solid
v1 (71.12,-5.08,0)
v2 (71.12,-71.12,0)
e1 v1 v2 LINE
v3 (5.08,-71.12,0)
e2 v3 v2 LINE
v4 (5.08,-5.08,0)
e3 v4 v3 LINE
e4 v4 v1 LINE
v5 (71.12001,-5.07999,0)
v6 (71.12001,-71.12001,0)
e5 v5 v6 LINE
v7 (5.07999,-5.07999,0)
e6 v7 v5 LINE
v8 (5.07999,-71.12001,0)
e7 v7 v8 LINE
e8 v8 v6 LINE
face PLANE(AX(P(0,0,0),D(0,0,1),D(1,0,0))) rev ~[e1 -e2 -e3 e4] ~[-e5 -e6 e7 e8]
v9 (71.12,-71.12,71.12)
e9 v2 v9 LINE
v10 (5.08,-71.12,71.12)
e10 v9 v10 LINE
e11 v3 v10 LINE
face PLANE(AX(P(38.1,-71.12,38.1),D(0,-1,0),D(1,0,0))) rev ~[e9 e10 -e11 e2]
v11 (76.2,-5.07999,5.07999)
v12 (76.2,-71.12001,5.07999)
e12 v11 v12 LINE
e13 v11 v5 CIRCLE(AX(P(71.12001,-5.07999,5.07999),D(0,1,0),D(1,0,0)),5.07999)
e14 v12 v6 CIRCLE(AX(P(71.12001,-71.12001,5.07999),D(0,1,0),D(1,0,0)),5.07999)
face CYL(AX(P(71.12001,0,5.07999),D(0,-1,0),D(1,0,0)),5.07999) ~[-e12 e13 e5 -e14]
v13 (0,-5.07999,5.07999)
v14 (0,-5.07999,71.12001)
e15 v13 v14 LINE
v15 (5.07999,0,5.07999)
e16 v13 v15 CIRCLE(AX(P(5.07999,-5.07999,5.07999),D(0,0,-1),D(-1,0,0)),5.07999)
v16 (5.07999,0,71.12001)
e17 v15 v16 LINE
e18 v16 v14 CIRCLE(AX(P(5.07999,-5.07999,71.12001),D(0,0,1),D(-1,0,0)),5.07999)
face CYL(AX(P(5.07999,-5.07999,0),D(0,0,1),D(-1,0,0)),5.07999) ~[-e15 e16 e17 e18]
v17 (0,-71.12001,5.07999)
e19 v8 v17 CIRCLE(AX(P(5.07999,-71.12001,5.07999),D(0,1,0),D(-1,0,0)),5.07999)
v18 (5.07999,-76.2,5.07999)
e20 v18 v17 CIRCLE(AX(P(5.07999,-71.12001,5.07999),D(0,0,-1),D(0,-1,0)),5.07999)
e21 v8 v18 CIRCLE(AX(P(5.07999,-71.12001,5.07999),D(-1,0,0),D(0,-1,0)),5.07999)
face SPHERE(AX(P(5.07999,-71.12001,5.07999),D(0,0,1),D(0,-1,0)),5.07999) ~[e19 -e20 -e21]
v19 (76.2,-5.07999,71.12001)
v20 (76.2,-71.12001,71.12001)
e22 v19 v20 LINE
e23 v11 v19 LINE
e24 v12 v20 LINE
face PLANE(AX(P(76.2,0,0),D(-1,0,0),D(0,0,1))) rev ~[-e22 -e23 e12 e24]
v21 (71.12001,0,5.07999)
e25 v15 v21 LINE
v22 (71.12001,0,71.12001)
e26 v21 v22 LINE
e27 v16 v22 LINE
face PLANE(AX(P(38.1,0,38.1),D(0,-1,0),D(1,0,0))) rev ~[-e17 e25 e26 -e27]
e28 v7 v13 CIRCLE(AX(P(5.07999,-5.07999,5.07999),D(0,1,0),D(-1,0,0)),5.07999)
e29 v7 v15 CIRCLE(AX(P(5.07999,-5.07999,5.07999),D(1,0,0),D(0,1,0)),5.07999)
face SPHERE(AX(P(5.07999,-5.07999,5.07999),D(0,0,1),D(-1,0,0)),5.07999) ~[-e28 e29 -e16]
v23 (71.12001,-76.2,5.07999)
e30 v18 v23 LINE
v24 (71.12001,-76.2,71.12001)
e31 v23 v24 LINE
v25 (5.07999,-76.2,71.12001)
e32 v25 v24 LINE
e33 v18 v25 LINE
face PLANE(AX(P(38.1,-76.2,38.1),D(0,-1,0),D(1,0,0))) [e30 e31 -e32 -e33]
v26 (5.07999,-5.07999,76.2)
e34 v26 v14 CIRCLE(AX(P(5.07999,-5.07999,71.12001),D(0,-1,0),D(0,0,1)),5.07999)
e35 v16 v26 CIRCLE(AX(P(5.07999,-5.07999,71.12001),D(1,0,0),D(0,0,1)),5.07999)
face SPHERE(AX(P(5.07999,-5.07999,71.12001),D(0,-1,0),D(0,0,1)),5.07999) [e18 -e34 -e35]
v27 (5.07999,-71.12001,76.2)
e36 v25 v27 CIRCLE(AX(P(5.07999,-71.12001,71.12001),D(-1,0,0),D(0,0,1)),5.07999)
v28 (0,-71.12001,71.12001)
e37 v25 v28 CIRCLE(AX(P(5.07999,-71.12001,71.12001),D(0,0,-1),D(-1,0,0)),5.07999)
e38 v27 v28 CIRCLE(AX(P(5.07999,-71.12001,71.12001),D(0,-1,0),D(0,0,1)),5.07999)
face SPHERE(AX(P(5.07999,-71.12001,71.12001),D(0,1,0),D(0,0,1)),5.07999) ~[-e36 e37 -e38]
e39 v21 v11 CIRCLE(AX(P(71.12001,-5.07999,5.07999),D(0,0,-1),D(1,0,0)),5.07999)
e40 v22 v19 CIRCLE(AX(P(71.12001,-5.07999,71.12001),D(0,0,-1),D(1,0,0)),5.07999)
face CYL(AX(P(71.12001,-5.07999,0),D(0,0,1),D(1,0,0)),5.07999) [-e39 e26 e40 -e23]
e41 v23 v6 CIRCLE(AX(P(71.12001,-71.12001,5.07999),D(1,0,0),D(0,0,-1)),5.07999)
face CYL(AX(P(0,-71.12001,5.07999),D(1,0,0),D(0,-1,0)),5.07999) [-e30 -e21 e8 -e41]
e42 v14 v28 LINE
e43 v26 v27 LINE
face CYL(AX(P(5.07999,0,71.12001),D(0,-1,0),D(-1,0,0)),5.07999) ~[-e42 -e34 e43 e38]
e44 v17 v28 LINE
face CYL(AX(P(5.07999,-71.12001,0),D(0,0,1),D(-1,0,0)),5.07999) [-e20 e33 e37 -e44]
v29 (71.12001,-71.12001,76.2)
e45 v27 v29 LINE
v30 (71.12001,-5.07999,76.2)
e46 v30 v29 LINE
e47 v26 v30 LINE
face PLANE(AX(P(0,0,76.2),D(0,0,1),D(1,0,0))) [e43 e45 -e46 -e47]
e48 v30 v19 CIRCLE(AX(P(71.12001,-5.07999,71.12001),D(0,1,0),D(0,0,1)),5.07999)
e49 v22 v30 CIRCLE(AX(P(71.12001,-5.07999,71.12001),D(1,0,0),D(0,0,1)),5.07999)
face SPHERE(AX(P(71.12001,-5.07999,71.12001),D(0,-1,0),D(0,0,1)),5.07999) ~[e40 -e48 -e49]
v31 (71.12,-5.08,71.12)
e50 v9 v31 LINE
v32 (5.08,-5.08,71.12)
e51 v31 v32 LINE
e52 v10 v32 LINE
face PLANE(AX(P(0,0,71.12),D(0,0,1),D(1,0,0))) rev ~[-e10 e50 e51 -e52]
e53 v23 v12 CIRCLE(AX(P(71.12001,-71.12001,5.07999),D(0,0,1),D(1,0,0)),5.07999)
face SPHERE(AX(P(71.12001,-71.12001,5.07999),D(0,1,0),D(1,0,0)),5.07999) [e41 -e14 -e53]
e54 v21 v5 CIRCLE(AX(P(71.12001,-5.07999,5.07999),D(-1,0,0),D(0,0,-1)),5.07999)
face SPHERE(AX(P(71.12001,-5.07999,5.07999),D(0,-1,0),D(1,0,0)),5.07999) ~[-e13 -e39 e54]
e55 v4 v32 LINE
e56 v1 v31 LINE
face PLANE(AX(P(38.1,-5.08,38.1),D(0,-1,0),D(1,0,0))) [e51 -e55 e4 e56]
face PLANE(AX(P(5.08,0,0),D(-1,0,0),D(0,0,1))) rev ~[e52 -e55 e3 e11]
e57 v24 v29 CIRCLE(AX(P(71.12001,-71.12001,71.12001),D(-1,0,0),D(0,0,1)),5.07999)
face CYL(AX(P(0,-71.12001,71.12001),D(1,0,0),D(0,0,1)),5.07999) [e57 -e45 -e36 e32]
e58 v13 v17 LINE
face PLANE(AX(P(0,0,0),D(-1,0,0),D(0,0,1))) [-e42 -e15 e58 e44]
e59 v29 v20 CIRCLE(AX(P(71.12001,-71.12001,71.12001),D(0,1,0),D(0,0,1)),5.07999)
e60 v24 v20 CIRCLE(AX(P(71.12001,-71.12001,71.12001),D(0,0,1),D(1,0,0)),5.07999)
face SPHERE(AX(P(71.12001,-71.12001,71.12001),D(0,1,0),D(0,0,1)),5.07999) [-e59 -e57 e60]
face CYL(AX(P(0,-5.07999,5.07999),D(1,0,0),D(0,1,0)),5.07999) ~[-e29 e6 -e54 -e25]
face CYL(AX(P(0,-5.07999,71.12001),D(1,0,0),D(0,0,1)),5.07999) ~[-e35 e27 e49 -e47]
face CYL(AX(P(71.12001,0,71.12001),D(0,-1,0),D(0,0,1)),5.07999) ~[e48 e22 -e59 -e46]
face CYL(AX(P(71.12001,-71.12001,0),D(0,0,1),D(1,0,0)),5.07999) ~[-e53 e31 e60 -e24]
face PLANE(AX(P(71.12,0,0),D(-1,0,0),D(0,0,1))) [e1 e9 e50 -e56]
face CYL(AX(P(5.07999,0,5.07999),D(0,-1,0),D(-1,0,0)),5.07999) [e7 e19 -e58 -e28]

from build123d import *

# Parameters (mm, degrees)
F0_W     = 76.2
F0_H     = 76.2
F1_DEPTH = 76.2
F2_T     = -5.08
F3_R     = 5.07999


# Not quite as in the source:
# - a fillet or chamfer is up to 0.001 mm smaller than in the source, because OpenCascade refuses the exact size


with BuildPart() as f1:
    # F0 (on Front) → F1 (new body)
    with BuildSketch(Plane.XZ):
        with Locations((38.1, 38.1)):
            Rectangle(F0_W, F0_H)
    extrude(amount=F1_DEPTH)

    # F2
    f2_openings = [f1.faces().sort_by_distance(p)[0] for p in [
        (38.1, -38.1, 0),
    ]]
    offset(amount=F2_T, openings=f2_openings)

    # F3 (radius 5.08 in the source; OpenCascade refuses exactly that, so slightly less here)
    f3_edges = [f1.edges().sort_by_distance(p)[0] for p in [
        (76.2, -38.1, 76.2),
        (0, -38.1, 76.2),
        (38.1, 0, 76.2),
        (38.1, -76.2, 76.2),
        (76.2, -38.1, 0),
        (76.2, 0, 38.1),
        (76.2, -76.2, 38.1),
        (0, 0, 38.1),
        (0, -76.2, 38.1),
        (38.1, -76.2, 0),
        (0, -38.1, 0),
        (38.1, 0, 0),
    ]]
    fillet(f3_edges, radius=F3_R)


solid = f1.part
